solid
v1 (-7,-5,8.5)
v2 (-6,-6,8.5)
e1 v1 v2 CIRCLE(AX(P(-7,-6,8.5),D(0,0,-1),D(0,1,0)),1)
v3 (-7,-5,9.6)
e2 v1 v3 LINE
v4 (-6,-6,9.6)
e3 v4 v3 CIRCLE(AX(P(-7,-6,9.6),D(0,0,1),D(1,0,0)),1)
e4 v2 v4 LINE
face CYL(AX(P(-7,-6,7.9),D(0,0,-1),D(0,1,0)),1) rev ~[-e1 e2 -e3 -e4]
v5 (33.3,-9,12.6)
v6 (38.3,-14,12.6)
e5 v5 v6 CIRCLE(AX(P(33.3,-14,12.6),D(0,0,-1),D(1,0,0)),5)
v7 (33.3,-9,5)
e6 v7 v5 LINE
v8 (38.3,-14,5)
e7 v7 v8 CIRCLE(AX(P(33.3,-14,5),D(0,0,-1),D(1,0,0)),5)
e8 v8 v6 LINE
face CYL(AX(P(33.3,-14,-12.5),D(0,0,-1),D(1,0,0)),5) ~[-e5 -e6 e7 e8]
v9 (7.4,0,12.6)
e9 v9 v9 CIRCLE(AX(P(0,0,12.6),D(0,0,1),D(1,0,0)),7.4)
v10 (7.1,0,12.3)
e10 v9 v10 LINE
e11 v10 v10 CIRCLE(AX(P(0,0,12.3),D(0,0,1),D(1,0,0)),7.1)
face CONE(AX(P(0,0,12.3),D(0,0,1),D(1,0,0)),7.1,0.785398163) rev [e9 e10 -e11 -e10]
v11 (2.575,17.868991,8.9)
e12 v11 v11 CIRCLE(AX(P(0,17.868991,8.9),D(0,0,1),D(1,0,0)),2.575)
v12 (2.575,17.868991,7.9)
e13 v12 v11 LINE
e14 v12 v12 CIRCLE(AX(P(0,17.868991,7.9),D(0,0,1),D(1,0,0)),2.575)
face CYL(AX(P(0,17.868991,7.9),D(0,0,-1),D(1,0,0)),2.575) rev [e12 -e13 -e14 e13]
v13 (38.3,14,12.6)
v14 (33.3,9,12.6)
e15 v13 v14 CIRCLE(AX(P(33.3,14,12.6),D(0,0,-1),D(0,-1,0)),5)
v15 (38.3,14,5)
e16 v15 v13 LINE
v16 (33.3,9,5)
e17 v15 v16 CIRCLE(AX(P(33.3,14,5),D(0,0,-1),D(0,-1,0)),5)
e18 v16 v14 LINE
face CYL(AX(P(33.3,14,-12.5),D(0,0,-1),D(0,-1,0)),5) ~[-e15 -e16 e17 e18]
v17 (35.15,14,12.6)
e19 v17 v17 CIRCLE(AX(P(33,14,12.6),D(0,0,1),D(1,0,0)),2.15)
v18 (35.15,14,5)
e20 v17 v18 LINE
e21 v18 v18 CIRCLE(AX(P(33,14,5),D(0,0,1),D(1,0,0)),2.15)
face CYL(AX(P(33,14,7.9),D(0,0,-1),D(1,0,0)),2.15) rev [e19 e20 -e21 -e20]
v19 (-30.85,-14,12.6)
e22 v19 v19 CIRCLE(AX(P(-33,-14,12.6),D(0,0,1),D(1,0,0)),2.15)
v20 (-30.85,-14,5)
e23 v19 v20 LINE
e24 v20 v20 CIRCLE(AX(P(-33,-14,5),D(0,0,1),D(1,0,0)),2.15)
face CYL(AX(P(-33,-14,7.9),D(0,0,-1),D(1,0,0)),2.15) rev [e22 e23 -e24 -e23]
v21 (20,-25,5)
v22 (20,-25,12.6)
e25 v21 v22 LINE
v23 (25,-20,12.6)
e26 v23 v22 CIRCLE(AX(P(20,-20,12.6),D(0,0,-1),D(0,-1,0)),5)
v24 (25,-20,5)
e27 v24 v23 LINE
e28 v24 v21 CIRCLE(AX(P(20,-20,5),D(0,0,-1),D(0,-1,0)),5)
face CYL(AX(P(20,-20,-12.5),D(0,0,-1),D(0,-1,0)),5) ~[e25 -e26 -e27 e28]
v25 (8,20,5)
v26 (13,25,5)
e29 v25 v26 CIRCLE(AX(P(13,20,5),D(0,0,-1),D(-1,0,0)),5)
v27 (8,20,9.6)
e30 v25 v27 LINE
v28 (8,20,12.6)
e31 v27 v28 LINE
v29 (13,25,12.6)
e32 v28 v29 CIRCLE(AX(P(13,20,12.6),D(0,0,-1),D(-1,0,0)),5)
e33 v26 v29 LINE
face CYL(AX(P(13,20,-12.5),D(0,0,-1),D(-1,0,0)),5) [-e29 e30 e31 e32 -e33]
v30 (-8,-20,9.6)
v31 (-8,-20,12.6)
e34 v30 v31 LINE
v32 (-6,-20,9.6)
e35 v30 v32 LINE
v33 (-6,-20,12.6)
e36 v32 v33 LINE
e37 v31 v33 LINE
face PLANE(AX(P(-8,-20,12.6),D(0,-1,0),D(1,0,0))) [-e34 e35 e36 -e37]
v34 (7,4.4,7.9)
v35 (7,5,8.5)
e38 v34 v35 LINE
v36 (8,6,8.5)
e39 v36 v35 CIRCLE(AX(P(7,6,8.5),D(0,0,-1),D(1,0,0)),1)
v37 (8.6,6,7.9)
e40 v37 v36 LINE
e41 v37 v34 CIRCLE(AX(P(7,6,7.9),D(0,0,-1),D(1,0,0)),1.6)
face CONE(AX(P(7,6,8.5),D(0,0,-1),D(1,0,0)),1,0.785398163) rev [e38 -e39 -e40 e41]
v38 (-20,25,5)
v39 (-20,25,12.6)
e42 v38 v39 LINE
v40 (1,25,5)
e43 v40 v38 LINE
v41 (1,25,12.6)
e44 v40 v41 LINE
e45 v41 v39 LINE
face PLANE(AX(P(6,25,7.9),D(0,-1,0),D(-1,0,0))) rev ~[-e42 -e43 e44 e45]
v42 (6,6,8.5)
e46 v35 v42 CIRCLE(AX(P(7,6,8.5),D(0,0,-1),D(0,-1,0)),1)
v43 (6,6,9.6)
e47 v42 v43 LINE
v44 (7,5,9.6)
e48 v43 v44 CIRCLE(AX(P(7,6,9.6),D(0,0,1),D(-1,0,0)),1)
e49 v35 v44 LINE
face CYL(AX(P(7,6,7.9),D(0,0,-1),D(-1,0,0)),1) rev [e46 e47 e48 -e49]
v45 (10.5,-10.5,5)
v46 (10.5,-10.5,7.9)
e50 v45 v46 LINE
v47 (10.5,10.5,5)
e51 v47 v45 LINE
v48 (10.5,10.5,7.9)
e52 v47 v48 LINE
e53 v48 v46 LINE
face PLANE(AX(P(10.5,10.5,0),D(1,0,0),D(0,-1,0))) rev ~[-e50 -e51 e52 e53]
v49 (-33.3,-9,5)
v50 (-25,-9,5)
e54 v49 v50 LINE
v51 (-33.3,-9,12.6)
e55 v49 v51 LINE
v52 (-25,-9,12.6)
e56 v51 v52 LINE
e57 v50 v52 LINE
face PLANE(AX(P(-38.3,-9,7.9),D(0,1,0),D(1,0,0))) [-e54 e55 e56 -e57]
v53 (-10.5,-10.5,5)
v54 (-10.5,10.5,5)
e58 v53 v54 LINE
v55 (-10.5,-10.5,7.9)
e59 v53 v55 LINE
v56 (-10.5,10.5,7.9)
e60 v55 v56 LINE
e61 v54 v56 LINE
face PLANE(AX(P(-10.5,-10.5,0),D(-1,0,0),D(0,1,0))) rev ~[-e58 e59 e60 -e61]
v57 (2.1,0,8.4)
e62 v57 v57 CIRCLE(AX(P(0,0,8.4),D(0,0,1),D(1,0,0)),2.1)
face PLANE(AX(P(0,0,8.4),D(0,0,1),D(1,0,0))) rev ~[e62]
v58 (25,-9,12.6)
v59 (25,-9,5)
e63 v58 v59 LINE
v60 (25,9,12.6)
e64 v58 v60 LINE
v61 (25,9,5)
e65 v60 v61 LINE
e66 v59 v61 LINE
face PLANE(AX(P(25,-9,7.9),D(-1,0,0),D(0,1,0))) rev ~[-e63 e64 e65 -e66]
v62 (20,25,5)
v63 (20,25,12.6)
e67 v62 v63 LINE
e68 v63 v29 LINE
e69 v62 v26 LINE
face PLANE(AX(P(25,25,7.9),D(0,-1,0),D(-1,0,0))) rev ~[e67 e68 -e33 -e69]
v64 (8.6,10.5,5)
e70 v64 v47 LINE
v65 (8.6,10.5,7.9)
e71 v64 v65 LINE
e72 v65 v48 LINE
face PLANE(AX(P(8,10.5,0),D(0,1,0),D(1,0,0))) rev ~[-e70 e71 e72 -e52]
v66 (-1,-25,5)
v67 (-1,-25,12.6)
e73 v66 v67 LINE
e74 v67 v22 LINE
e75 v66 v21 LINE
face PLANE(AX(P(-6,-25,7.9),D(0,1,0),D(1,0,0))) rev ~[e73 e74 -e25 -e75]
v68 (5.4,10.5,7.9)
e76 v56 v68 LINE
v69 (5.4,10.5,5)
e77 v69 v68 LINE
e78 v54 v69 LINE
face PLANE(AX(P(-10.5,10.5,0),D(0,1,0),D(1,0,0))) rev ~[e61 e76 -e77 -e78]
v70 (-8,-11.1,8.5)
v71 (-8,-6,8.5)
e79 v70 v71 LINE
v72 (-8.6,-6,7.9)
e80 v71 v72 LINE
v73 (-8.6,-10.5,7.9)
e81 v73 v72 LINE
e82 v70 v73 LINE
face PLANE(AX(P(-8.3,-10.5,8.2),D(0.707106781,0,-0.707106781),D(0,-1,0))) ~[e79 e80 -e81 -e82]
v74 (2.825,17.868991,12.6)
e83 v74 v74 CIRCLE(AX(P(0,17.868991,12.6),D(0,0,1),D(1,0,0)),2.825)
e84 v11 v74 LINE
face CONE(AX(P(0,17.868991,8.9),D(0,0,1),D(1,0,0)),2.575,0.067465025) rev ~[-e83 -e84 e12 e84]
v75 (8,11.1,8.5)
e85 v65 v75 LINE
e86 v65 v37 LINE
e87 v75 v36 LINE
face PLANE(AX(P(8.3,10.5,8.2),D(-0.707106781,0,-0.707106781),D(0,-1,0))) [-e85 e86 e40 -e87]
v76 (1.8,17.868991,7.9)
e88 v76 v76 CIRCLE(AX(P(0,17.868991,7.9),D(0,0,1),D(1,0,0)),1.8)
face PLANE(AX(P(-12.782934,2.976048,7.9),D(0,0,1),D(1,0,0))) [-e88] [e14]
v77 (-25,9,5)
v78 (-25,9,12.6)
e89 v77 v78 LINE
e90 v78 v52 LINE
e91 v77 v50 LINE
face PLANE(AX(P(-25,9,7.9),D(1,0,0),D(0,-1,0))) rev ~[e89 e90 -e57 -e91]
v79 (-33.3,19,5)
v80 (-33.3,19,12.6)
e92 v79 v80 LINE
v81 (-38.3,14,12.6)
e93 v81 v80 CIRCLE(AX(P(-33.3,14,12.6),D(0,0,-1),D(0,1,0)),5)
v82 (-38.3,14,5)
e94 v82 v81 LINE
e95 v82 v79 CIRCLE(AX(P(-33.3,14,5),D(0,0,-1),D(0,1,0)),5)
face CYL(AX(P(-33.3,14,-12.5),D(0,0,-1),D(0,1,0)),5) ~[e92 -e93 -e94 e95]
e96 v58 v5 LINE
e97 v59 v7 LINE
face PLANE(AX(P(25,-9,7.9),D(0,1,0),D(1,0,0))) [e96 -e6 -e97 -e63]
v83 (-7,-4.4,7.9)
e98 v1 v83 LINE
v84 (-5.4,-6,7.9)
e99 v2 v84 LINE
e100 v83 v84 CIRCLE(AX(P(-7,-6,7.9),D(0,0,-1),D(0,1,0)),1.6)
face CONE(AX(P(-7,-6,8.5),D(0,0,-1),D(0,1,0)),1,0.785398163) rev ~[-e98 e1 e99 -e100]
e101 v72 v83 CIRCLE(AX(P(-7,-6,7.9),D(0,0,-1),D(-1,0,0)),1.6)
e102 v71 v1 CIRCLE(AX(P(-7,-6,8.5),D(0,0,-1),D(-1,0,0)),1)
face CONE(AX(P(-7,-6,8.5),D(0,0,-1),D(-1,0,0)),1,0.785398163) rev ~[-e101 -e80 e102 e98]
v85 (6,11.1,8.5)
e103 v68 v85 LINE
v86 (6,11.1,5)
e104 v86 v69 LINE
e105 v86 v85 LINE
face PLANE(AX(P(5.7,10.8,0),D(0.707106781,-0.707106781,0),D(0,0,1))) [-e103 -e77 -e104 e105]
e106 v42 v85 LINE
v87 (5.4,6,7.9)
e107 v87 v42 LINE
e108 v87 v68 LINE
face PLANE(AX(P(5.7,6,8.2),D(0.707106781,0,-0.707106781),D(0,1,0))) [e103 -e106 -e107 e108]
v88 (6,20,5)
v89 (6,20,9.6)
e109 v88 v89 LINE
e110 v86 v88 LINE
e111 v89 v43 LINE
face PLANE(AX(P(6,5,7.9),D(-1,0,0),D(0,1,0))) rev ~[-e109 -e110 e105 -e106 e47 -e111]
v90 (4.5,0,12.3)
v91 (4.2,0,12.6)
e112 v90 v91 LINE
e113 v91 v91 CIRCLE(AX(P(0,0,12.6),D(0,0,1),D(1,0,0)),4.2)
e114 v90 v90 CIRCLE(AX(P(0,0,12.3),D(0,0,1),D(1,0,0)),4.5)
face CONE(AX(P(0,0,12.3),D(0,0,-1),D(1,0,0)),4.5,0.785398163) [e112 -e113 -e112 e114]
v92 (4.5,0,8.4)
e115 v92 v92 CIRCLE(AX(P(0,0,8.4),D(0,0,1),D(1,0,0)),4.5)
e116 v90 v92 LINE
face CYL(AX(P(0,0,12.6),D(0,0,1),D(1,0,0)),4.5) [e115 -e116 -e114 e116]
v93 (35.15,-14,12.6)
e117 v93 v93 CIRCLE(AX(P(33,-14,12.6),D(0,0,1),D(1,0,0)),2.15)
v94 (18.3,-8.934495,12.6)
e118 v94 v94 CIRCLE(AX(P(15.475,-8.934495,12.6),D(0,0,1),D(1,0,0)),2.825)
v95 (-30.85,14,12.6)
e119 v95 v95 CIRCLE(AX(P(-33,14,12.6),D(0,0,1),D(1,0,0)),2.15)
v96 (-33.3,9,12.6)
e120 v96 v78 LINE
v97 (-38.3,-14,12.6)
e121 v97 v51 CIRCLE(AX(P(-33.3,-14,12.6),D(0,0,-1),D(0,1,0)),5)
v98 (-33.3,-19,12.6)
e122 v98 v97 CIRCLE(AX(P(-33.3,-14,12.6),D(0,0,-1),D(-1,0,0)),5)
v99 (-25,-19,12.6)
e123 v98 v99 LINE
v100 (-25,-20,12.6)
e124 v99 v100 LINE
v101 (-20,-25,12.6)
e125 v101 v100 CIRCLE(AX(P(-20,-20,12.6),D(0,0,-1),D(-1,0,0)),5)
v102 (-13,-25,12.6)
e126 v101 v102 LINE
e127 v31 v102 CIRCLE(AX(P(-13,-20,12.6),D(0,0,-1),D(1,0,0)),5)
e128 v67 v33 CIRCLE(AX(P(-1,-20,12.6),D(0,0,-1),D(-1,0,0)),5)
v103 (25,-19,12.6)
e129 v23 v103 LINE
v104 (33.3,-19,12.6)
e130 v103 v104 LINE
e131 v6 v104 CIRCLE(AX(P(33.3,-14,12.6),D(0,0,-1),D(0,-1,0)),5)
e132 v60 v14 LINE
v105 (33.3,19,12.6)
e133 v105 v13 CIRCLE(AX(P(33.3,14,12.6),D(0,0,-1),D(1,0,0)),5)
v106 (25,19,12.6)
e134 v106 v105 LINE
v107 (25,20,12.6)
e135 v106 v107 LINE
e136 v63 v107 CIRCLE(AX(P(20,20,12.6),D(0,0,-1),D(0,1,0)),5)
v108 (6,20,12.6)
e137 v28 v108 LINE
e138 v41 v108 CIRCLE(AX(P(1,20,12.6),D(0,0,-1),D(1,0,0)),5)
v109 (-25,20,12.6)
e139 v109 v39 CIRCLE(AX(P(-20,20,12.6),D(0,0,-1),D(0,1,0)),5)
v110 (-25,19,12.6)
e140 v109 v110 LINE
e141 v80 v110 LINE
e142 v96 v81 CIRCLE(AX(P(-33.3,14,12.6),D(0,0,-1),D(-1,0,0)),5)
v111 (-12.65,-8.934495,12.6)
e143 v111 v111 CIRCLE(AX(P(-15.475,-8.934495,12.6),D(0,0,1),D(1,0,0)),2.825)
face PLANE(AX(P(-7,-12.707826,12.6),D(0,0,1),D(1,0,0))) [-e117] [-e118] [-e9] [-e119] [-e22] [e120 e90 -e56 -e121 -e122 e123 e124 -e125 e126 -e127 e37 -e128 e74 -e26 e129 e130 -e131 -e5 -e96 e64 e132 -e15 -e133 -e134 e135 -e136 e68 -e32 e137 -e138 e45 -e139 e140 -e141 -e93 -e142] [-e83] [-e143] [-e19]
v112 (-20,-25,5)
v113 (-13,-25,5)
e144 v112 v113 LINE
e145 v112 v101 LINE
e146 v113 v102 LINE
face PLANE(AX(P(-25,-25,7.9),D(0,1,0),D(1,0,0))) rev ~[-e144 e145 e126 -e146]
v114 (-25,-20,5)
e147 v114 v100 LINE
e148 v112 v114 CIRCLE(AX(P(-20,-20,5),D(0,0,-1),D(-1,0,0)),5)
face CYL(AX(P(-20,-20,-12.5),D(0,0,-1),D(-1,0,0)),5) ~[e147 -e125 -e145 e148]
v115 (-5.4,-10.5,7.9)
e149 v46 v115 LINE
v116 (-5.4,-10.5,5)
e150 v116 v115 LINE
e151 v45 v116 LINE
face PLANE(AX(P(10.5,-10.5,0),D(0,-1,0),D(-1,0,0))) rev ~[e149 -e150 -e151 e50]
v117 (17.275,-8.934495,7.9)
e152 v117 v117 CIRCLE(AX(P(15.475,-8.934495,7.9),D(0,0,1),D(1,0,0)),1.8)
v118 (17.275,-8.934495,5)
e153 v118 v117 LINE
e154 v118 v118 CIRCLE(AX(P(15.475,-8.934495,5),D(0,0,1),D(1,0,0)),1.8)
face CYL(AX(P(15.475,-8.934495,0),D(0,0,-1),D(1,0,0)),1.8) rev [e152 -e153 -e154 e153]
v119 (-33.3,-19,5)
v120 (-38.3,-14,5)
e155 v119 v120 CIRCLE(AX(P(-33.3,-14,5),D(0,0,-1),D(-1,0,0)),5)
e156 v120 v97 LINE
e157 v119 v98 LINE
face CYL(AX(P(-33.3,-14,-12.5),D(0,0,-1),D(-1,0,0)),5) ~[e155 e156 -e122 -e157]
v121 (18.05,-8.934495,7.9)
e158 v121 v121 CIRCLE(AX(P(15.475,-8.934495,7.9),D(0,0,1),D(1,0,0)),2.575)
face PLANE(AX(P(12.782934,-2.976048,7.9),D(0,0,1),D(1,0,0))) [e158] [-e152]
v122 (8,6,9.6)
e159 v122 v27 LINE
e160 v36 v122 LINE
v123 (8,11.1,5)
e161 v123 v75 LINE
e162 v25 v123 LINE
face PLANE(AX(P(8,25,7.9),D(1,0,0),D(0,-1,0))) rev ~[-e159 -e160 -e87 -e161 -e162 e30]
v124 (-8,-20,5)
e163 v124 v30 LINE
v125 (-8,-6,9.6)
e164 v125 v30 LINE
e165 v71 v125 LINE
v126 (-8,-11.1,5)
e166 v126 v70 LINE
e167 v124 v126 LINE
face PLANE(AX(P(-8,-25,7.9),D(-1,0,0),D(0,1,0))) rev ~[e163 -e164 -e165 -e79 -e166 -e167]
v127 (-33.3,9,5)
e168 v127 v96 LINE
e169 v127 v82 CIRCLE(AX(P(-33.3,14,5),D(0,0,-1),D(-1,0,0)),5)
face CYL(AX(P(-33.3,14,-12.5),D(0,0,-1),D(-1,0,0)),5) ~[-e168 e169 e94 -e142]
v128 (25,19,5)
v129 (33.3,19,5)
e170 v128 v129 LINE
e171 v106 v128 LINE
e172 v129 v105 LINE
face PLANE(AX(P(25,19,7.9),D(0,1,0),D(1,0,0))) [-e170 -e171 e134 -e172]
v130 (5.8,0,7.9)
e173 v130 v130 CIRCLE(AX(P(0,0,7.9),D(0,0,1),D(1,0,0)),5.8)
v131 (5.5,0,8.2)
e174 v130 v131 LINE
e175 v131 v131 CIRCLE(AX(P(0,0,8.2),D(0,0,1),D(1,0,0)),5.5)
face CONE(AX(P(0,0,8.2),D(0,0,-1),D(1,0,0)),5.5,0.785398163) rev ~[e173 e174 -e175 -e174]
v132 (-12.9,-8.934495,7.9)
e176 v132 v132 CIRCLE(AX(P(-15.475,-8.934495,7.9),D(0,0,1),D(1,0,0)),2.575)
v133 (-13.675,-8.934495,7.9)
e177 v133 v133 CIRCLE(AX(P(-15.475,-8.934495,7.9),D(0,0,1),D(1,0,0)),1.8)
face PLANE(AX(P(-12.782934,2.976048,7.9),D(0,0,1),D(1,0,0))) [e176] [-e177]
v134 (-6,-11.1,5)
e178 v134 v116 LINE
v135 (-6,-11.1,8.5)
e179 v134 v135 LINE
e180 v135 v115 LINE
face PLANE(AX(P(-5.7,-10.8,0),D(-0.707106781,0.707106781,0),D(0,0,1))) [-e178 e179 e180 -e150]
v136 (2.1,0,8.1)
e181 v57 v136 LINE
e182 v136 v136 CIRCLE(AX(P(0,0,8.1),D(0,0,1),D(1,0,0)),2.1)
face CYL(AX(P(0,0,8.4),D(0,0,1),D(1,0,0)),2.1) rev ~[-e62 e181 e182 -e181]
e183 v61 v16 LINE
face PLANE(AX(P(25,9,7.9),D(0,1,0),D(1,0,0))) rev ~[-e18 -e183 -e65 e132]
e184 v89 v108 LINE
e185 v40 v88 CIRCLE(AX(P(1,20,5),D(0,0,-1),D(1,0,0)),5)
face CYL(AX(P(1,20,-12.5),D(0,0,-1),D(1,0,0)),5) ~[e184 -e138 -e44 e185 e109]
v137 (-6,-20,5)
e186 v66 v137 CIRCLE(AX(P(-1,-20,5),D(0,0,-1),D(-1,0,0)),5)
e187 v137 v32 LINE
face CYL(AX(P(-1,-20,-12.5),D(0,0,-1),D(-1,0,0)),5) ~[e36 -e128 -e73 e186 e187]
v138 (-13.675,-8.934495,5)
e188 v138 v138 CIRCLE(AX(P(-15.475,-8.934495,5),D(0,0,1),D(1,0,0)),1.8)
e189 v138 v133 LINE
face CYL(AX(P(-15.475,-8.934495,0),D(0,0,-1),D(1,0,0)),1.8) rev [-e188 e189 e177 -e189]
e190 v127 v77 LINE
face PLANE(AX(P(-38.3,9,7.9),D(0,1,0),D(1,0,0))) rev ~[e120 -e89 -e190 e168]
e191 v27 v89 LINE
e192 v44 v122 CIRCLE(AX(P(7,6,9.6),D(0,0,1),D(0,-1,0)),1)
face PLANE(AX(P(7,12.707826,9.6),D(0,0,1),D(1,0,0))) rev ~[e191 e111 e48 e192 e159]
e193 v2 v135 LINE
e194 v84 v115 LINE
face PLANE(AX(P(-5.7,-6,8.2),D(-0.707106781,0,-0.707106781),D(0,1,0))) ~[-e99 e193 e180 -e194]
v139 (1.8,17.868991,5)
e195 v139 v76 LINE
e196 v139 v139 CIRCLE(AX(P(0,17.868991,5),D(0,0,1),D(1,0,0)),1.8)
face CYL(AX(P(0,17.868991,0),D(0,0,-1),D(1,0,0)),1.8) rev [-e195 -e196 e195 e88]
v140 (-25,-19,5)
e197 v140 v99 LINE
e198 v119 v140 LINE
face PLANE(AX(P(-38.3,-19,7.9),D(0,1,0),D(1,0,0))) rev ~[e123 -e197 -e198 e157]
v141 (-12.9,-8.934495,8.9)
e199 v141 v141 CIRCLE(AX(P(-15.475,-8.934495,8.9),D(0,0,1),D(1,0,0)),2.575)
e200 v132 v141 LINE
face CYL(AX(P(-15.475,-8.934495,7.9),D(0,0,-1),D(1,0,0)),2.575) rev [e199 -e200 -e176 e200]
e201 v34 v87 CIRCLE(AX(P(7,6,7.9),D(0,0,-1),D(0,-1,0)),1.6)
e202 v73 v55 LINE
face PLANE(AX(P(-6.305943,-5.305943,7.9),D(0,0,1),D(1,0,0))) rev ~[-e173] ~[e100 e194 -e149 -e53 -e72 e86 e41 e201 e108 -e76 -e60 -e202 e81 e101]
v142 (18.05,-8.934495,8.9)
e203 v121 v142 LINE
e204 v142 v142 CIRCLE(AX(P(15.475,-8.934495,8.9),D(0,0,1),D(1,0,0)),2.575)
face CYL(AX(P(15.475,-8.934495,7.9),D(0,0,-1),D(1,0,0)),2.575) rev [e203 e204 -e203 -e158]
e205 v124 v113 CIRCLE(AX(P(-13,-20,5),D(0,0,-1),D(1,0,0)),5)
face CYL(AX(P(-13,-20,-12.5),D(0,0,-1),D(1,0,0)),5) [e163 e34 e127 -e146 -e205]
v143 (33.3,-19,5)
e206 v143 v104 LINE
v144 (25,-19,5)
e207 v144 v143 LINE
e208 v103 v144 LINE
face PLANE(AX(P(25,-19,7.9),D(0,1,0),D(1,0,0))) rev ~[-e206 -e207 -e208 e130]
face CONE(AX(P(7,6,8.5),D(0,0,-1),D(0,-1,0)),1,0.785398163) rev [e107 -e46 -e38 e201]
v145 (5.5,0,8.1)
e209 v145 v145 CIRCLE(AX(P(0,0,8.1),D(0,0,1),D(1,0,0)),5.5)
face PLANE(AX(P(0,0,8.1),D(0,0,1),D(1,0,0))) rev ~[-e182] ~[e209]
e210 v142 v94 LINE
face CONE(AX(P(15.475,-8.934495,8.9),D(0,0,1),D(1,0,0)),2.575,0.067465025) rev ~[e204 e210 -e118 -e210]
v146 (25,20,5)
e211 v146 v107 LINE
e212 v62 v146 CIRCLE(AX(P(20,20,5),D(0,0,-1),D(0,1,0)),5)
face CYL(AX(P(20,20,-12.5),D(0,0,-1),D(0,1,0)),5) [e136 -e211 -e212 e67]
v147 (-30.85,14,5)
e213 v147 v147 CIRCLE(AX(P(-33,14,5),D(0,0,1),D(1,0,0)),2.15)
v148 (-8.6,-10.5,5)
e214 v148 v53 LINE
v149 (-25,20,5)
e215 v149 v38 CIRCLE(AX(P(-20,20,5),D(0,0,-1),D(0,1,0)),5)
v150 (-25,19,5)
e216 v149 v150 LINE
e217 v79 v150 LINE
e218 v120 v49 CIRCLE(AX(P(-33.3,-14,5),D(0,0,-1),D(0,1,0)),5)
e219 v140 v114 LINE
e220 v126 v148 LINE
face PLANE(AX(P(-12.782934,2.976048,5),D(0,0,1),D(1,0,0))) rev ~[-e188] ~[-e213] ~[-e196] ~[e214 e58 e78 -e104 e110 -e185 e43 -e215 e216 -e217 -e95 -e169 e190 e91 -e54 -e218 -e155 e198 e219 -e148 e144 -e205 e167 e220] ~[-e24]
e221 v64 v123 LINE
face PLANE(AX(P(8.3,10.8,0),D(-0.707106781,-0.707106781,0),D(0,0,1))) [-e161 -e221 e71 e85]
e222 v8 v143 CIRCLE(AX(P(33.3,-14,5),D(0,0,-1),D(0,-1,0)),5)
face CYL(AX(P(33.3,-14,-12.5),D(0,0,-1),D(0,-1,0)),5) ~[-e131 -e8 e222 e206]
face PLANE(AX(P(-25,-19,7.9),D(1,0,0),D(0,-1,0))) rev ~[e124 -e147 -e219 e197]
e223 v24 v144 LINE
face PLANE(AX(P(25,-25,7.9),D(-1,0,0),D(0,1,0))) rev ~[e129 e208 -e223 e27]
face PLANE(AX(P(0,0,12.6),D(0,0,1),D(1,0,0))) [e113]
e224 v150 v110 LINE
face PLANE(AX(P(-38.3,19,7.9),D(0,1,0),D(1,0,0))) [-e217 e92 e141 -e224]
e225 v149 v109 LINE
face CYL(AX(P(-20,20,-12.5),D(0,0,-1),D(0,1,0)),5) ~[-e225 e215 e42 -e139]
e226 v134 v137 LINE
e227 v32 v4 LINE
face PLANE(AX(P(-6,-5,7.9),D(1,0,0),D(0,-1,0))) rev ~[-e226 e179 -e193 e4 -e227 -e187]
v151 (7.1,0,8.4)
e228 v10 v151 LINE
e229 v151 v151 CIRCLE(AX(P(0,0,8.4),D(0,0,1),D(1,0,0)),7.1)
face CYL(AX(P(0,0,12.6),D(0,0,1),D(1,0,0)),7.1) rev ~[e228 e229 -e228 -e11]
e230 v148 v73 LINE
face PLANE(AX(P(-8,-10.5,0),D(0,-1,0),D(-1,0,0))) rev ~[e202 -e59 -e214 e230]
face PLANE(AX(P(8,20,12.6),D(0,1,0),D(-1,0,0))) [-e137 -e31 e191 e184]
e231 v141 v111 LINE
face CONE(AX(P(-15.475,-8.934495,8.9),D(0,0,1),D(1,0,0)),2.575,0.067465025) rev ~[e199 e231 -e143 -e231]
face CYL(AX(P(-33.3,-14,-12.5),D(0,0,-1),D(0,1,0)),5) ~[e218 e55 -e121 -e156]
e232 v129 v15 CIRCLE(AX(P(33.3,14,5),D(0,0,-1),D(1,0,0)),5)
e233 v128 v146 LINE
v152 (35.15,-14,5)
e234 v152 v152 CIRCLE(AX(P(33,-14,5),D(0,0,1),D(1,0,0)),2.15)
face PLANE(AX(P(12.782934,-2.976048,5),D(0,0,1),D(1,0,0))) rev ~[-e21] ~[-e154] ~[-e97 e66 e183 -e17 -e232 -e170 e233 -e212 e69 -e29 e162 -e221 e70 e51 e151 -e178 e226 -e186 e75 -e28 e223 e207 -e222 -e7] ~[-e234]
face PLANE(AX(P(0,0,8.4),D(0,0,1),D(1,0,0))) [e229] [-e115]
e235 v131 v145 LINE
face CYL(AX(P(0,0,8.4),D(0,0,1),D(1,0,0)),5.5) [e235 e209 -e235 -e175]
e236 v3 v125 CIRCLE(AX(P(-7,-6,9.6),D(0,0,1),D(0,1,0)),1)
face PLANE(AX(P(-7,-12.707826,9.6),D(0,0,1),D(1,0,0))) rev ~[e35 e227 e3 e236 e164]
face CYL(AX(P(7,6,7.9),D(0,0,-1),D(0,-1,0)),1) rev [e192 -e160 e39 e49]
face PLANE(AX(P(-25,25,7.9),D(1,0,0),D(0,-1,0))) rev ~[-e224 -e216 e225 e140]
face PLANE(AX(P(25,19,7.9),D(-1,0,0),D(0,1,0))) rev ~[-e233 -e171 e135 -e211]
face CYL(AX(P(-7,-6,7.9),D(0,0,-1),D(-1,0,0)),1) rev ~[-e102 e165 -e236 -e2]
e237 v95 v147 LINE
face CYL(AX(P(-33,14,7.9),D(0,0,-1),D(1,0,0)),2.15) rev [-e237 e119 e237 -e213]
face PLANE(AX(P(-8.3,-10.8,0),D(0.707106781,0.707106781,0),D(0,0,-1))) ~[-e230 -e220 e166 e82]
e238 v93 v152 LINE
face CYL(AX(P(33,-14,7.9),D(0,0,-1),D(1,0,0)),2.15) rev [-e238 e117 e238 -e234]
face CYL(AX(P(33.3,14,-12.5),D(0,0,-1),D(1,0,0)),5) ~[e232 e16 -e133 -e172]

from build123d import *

# Parameters (mm, degrees)
F0_R        = 1.8
F0_W        = 13.3
F0_H        = 10
F0_R_2      = 2.15
F1_DEPTH    = 7.9
F2_R        = 2.575
F2_R_2      = 5.5
F2_W        = 13.3
F2_H        = 10
F2_R_3      = 2.15
F3_DEPTH    = 4.7
F4_T1_DEPTH = 4.7
F5_T1_DEPTH = 37.6
F6_SIZE     = 0.6
F7_SIZE2    = 0.25
F7_SIZE     = 3.7
F7_2_SIZE2  = 0.25
F7_2_SIZE   = 3.7
F7_3_SIZE2  = 0.25
F7_3_SIZE   = 3.7
F8_DEPTH    = 5
F9_R        = 7.1
F9_R_2      = 5.5
F10_DEPTH   = 4.2
F9_R_3      = 4.5
F11_DEPTH   = 4.2
F12_SIZE    = 0.3
F12_2_SIZE  = 0.3
F13_R       = 5.5
F13_R_2     = 2.1
F14_DEPTH   = 0.3
F16_DEPTH   = 3


# Not quite as in the source:
# - a fillet or chamfer that OpenCascade refuses, or shapes differently, is made with other operations: its cross-section is extruded or revolved along the edge and cut away or added


with BuildPart() as f1:
    # F0 (on Top) → F1 (new body)
    with BuildSketch(Plane.XY):
        Polygon((-10.5, 10.5), (6, 10.5), (6, 25), (-25, 25), (-25, 19), (-25, 9), (-25, -9), (-25, -19), (-25, -25), (-8, -25), (-8, -10.5), (-10.5, -10.5), align=None)
        with Locations((-15.475, -8.9344954157)):
            Circle(F0_R, mode=Mode.SUBTRACT)
        with Locations((0, 17.8689908314)):
            Circle(F0_R, mode=Mode.SUBTRACT)
        with Locations((-31.65, 14)):
            Rectangle(F0_W, F0_H)
        with Locations((-33, 14)):
            Circle(F0_R_2, mode=Mode.SUBTRACT)
        with Locations((-31.65, -14)):
            Rectangle(F0_W, F0_H)
        with Locations((-33, -14)):
            Circle(F0_R_2, mode=Mode.SUBTRACT)
    extrude(amount=F1_DEPTH)



with BuildPart() as f1b:
    # F0 (on Top) → F1, piece 2 (new body)
    with BuildSketch(Plane.XY):
        Polygon((8, 10.5), (10.5, 10.5), (10.5, -10.5), (-6, -10.5), (-6, -25), (25, -25), (25, -19), (25, -9), (25, 9), (25, 19), (25, 25), (8, 25), align=None)
        with Locations((15.475, -8.9344954157)):
            Circle(F0_R, mode=Mode.SUBTRACT)
        with Locations((31.65, -14)):
            Rectangle(F0_W, F0_H)
        with Locations((33, -14)):
            Circle(F0_R_2, mode=Mode.SUBTRACT)
        with Locations((31.65, 14)):
            Rectangle(F0_W, F0_H)
        with Locations((33, 14)):
            Circle(F0_R_2, mode=Mode.SUBTRACT)
    extrude(amount=F1_DEPTH)


with BuildPart() as f1_1:
    add(f1.part)

    add(f1b.part)  # F3 merges F1b
    # F2 (on face) → F3 (join)
    with BuildSketch(Plane.XY.offset(7.9)):
        Polygon((6, 10.5), (6, 25), (-25, 25), (-25, 19), (-25, 9), (-25, -9), (-25, -19), (-25, -25), (-8, -25), (-8, -10.5), (-10.5, -10.5), (-10.5, 10.5), align=None)
        with Locations((-15.475, -8.9344954157)):
            Circle(F2_R, mode=Mode.SUBTRACT)
        with Locations((0, 17.8689908314)):
            Circle(F2_R, mode=Mode.SUBTRACT)
        Polygon((25, 19), (25, 25), (8, 25), (8, 10.5), (8, 5), (6, 5), (6, 10.5), (-10.5, 10.5), (-10.5, -10.5), (-8, -10.5), (-8, -5), (-6, -5), (-6, -10.5), (-6, -25), (25, -25), (25, -19), (25, -9), (25, 9), align=None)
        with Locations((15.475, -8.9344954157)):
            Circle(F2_R, mode=Mode.SUBTRACT)
        Circle(F2_R_2, mode=Mode.SUBTRACT)
        with Locations((-31.65, -14)):
            Rectangle(F2_W, F2_H)
        with Locations((-33, -14)):
            Circle(F2_R_3, mode=Mode.SUBTRACT)
        with Locations((-31.65, 14)):
            Rectangle(F2_W, F2_H)
        with Locations((-33, 14)):
            Circle(F2_R_3, mode=Mode.SUBTRACT)
        with Locations((31.65, 14)):
            Rectangle(F2_W, F2_H)
        with Locations((33, 14)):
            Circle(F2_R_3, mode=Mode.SUBTRACT)
        with Locations((31.65, -14)):
            Rectangle(F2_W, F2_H)
        with Locations((33, -14)):
            Circle(F2_R_3, mode=Mode.SUBTRACT)
    extrude(amount=F3_DEPTH)

    # F4: fillet of radius 1 on 4 edges, made by hand

    # F4_s2 → F4_t1 (join)
    with BuildSketch(Plane.XY.offset(7.9)):
        with BuildLine():
            ThreePointArc((-7, -5), (-6.2928932188, -5.2928932188), (-6, -6))
            Line((-6, -6), (-6, -5))
            Line((-6, -5), (-7, -5))
        make_face()
        with BuildLine():
            ThreePointArc((-8, -6), (-7.7071067812, -5.2928932188), (-7, -5))
            Line((-7, -5), (-8, -5))
            Line((-8, -5), (-8, -6))
        make_face()
        with BuildLine():
            ThreePointArc((6, 6), (6.2928932188, 5.2928932188), (7, 5))
            Line((7, 5), (6, 5))
            Line((6, 5), (6, 6))
        make_face()
        with BuildLine():
            ThreePointArc((7, 5), (7.7071067812, 5.2928932188), (8, 6))
            Line((8, 6), (8, 5))
            Line((8, 5), (7, 5))
        make_face()
    extrude(amount=F4_T1_DEPTH)

    # F5: fillet of radius 5 on 16 edges, made by hand

    # F5_s2 → F5_t1 (cut)
    with BuildSketch(Plane.XY.offset(-12.5)):
        with BuildLine():
            ThreePointArc((-38.3, 14), (-36.8355339059, 10.4644660941), (-33.3, 9))
            Line((-33.3, 9), (-38.3, 9))
            Line((-38.3, 9), (-38.3, 14))
        make_face()
        with BuildLine():
            ThreePointArc((-33.3, 19), (-36.8355339059, 17.5355339059), (-38.3, 14))
            Line((-38.3, 14), (-38.3, 19))
            Line((-38.3, 19), (-33.3, 19))
        make_face()
        with BuildLine():
            ThreePointArc((-38.3, -14), (-36.8355339059, -17.5355339059), (-33.3, -19))
            Line((-33.3, -19), (-38.3, -19))
            Line((-38.3, -19), (-38.3, -14))
        make_face()
        with BuildLine():
            ThreePointArc((-33.3, -9), (-36.8355339059, -10.4644660941), (-38.3, -14))
            Line((-38.3, -14), (-38.3, -9))
            Line((-38.3, -9), (-33.3, -9))
        make_face()
        with BuildLine():
            ThreePointArc((33.3, -19), (36.8355339059, -17.5355339059), (38.3, -14))
            Line((38.3, -14), (38.3, -19))
            Line((38.3, -19), (33.3, -19))
        make_face()
        with BuildLine():
            ThreePointArc((38.3, -14), (36.8355339059, -10.4644660941), (33.3, -9))
            Line((33.3, -9), (38.3, -9))
            Line((38.3, -9), (38.3, -14))
        make_face()
        with BuildLine():
            ThreePointArc((33.3, 9), (36.8355339059, 10.4644660941), (38.3, 14))
            Line((38.3, 14), (38.3, 9))
            Line((38.3, 9), (33.3, 9))
        make_face()
        with BuildLine():
            ThreePointArc((38.3, 14), (36.8355339059, 17.5355339059), (33.3, 19))
            Line((33.3, 19), (38.3, 19))
            Line((38.3, 19), (38.3, 14))
        make_face()
        with BuildLine():
            ThreePointArc((-25, -20), (-23.5355339059, -23.5355339059), (-20, -25))
            Line((-20, -25), (-25, -25))
            Line((-25, -25), (-25, -20))
        make_face()
        with BuildLine():
            ThreePointArc((20, -25), (23.5355339059, -23.5355339059), (25, -20))
            Line((25, -20), (25, -25))
            Line((25, -25), (20, -25))
        make_face()
        with BuildLine():
            ThreePointArc((20, 25), (23.5355339059, 23.5355339059), (25, 20))
            Line((25, 20), (25, 25))
            Line((25, 25), (20, 25))
        make_face()
        with BuildLine():
            ThreePointArc((-20, 25), (-23.5355339059, 23.5355339059), (-25, 20))
            Line((-25, 20), (-25, 25))
            Line((-25, 25), (-20, 25))
        make_face()
        with BuildLine():
            ThreePointArc((6, 20), (4.5355339059, 23.5355339059), (1, 25))
            Line((1, 25), (6, 25))
            Line((6, 25), (6, 20))
        make_face()
        with BuildLine():
            ThreePointArc((8, 20), (9.4644660941, 23.5355339059), (13, 25))
            Line((13, 25), (8, 25))
            Line((8, 25), (8, 20))
        make_face()
        with BuildLine():
            ThreePointArc((-8, -20), (-9.4644660941, -23.5355339059), (-13, -25))
            Line((-13, -25), (-8, -25))
            Line((-8, -25), (-8, -20))
        make_face()
        with BuildLine():
            ThreePointArc((-6, -20), (-4.5355339059, -23.5355339059), (-1, -25))
            Line((-1, -25), (-6, -25))
            Line((-6, -25), (-6, -20))
        make_face()
    extrude(amount=F5_T1_DEPTH, mode=Mode.SUBTRACT)

    # F6
    f6_edges = [f1_1.edges().sort_by_distance(p)[0] for p in [
        (-10.5, 0, 0),
        (-9.25, -10.5, 0),
        (2.25, -10.5, 0),
        (10.5, 0, 0),
        (9.25, 10.5, 0),
        (-2.25, 10.5, 0),
        (-6, -8.25, 7.9),
        (8, 8.25, 7.9),
        (-8, -10.5, 3.95),
        (-6, -10.5, 3.95),
        (6, 10.5, 3.95),
        (8, 10.5, 3.95),
        (7.707107, 5.292893, 7.9),
        (6.292893, 5.292893, 7.9),
        (6, 8.25, 7.9),
        (-8, -8.25, 7.9),
        (-7.707107, -5.292893, 7.9),
        (-6.292893, -5.292893, 7.9),
    ]]
    chamfer(f6_edges, length=F6_SIZE)

    # F7
    f7_edges = [f1_1.edges().sort_by_distance(p)[0] for p in [
        (-2.575, 17.868991, 12.6),
    ]]
    f7_side = f1_1.faces().sort_by_distance((-2.575, 17.868991, 10.25))[0]
    chamfer(f7_edges, length=F7_SIZE, length2=F7_SIZE2, reference=f7_side)

    # F7#2
    f7_2_edges = [f1_1.edges().sort_by_distance(p)[0] for p in [
        (12.9, -8.934495, 12.6),
    ]]
    f7_2_side = f1_1.faces().sort_by_distance((12.9, -8.934495, 10.25))[0]
    chamfer(f7_2_edges, length=F7_2_SIZE, length2=F7_2_SIZE2, reference=f7_2_side)

    # F7#3
    f7_3_edges = [f1_1.edges().sort_by_distance(p)[0] for p in [
        (-18.05, -8.934495, 12.6),
    ]]
    f7_3_side = f1_1.faces().sort_by_distance((-18.05, -8.934495, 10.25))[0]
    chamfer(f7_3_edges, length=F7_3_SIZE, length2=F7_3_SIZE2, reference=f7_3_side)

    # F0 (on Top) → F8 (cut)
    with BuildSketch(Plane.XY):
        Polygon((-10.5, 10.5), (6, 10.5), (6, 25), (-25, 25), (-25, 19), (-25, 9), (-25, -9), (-25, -19), (-25, -25), (-8, -25), (-8, -10.5), (-10.5, -10.5), align=None)
        with Locations((-15.475, -8.9344954157)):
            Circle(F0_R, mode=Mode.SUBTRACT)
        with Locations((0, 17.8689908314)):
            Circle(F0_R, mode=Mode.SUBTRACT)
        Polygon((8, 10.5), (10.5, 10.5), (10.5, -10.5), (-6, -10.5), (-6, -25), (25, -25), (25, -19), (25, -9), (25, 9), (25, 19), (25, 25), (8, 25), align=None)
        with Locations((15.475, -8.9344954157)):
            Circle(F0_R, mode=Mode.SUBTRACT)
        with Locations((-31.65, -14)):
            Rectangle(F0_W, F0_H)
        with Locations((-33, -14)):
            Circle(F0_R_2, mode=Mode.SUBTRACT)
        with Locations((-31.65, 14)):
            Rectangle(F0_W, F0_H)
        with Locations((-33, 14)):
            Circle(F0_R_2, mode=Mode.SUBTRACT)
        with Locations((31.65, 14)):
            Rectangle(F0_W, F0_H)
        with Locations((33, 14)):
            Circle(F0_R_2, mode=Mode.SUBTRACT)
        with Locations((31.65, -14)):
            Rectangle(F0_W, F0_H)
        with Locations((33, -14)):
            Circle(F0_R_2, mode=Mode.SUBTRACT)
    extrude(amount=F8_DEPTH, mode=Mode.SUBTRACT)

    # F9 (on face) → F10 (cut)
    with BuildSketch(Plane.XY.offset(12.6)):
        Circle(F9_R)
        Circle(F9_R_2, mode=Mode.SUBTRACT)
    extrude(amount=-F10_DEPTH, mode=Mode.SUBTRACT)

    # F12
    f12_edges = [f1_1.edges().sort_by_distance(p)[0] for p in [
        (-5.5, 0, 7.9),
        (-7.1, 0, 12.6),
    ]]
    chamfer(f12_edges, length=F12_SIZE)



with BuildPart() as f11:
    # F9 (on face) → F11 (new body, through all)
    with BuildSketch(Plane.XY.offset(12.6)):
        Circle(F9_R_3)
    extrude(amount=-F11_DEPTH)

    # F12#2
    f12_2_edges = [f11.edges().sort_by_distance(p)[0] for p in [
        (-4.5, 0, 12.6),
    ]]
    chamfer(f12_2_edges, length=F12_2_SIZE)


with BuildPart() as f1_2:
    add(f1_1.part)

    add(f11.part)  # F14 merges F11
    # F13 (on face) → F14 (join)
    with BuildSketch(Plane.XY.offset(8.4)):
        Circle(F13_R)
        Circle(F13_R_2, mode=Mode.SUBTRACT)
    extrude(amount=-F14_DEPTH)

    # F15 (on face) → F16 (join)
    with BuildSketch(Plane.XY.offset(12.6)):
        with BuildLine():
            Line((-6, -20), (-6, -6))
            ThreePointArc((-6, -6), (-6.2928932188, -5.2928932188), (-7, -5))
            ThreePointArc((-7, -5), (-7.7071067812, -5.2928932188), (-8, -6))
            Line((-8, -6), (-8, -20))
            Line((-8, -20), (-6, -20))
        make_face()
        with BuildLine():
            Line((8, 6), (8, 20))
            Line((8, 20), (6, 20))
            Line((6, 20), (6, 11.1))
            Line((6, 11.1), (6, 6))
            ThreePointArc((6, 6), (6.2928932188, 5.2928932188), (7, 5))
            ThreePointArc((7, 5), (7.7071067812, 5.2928932188), (8, 6))
        make_face()
    extrude(amount=-F16_DEPTH)


solid = f1_2.part
